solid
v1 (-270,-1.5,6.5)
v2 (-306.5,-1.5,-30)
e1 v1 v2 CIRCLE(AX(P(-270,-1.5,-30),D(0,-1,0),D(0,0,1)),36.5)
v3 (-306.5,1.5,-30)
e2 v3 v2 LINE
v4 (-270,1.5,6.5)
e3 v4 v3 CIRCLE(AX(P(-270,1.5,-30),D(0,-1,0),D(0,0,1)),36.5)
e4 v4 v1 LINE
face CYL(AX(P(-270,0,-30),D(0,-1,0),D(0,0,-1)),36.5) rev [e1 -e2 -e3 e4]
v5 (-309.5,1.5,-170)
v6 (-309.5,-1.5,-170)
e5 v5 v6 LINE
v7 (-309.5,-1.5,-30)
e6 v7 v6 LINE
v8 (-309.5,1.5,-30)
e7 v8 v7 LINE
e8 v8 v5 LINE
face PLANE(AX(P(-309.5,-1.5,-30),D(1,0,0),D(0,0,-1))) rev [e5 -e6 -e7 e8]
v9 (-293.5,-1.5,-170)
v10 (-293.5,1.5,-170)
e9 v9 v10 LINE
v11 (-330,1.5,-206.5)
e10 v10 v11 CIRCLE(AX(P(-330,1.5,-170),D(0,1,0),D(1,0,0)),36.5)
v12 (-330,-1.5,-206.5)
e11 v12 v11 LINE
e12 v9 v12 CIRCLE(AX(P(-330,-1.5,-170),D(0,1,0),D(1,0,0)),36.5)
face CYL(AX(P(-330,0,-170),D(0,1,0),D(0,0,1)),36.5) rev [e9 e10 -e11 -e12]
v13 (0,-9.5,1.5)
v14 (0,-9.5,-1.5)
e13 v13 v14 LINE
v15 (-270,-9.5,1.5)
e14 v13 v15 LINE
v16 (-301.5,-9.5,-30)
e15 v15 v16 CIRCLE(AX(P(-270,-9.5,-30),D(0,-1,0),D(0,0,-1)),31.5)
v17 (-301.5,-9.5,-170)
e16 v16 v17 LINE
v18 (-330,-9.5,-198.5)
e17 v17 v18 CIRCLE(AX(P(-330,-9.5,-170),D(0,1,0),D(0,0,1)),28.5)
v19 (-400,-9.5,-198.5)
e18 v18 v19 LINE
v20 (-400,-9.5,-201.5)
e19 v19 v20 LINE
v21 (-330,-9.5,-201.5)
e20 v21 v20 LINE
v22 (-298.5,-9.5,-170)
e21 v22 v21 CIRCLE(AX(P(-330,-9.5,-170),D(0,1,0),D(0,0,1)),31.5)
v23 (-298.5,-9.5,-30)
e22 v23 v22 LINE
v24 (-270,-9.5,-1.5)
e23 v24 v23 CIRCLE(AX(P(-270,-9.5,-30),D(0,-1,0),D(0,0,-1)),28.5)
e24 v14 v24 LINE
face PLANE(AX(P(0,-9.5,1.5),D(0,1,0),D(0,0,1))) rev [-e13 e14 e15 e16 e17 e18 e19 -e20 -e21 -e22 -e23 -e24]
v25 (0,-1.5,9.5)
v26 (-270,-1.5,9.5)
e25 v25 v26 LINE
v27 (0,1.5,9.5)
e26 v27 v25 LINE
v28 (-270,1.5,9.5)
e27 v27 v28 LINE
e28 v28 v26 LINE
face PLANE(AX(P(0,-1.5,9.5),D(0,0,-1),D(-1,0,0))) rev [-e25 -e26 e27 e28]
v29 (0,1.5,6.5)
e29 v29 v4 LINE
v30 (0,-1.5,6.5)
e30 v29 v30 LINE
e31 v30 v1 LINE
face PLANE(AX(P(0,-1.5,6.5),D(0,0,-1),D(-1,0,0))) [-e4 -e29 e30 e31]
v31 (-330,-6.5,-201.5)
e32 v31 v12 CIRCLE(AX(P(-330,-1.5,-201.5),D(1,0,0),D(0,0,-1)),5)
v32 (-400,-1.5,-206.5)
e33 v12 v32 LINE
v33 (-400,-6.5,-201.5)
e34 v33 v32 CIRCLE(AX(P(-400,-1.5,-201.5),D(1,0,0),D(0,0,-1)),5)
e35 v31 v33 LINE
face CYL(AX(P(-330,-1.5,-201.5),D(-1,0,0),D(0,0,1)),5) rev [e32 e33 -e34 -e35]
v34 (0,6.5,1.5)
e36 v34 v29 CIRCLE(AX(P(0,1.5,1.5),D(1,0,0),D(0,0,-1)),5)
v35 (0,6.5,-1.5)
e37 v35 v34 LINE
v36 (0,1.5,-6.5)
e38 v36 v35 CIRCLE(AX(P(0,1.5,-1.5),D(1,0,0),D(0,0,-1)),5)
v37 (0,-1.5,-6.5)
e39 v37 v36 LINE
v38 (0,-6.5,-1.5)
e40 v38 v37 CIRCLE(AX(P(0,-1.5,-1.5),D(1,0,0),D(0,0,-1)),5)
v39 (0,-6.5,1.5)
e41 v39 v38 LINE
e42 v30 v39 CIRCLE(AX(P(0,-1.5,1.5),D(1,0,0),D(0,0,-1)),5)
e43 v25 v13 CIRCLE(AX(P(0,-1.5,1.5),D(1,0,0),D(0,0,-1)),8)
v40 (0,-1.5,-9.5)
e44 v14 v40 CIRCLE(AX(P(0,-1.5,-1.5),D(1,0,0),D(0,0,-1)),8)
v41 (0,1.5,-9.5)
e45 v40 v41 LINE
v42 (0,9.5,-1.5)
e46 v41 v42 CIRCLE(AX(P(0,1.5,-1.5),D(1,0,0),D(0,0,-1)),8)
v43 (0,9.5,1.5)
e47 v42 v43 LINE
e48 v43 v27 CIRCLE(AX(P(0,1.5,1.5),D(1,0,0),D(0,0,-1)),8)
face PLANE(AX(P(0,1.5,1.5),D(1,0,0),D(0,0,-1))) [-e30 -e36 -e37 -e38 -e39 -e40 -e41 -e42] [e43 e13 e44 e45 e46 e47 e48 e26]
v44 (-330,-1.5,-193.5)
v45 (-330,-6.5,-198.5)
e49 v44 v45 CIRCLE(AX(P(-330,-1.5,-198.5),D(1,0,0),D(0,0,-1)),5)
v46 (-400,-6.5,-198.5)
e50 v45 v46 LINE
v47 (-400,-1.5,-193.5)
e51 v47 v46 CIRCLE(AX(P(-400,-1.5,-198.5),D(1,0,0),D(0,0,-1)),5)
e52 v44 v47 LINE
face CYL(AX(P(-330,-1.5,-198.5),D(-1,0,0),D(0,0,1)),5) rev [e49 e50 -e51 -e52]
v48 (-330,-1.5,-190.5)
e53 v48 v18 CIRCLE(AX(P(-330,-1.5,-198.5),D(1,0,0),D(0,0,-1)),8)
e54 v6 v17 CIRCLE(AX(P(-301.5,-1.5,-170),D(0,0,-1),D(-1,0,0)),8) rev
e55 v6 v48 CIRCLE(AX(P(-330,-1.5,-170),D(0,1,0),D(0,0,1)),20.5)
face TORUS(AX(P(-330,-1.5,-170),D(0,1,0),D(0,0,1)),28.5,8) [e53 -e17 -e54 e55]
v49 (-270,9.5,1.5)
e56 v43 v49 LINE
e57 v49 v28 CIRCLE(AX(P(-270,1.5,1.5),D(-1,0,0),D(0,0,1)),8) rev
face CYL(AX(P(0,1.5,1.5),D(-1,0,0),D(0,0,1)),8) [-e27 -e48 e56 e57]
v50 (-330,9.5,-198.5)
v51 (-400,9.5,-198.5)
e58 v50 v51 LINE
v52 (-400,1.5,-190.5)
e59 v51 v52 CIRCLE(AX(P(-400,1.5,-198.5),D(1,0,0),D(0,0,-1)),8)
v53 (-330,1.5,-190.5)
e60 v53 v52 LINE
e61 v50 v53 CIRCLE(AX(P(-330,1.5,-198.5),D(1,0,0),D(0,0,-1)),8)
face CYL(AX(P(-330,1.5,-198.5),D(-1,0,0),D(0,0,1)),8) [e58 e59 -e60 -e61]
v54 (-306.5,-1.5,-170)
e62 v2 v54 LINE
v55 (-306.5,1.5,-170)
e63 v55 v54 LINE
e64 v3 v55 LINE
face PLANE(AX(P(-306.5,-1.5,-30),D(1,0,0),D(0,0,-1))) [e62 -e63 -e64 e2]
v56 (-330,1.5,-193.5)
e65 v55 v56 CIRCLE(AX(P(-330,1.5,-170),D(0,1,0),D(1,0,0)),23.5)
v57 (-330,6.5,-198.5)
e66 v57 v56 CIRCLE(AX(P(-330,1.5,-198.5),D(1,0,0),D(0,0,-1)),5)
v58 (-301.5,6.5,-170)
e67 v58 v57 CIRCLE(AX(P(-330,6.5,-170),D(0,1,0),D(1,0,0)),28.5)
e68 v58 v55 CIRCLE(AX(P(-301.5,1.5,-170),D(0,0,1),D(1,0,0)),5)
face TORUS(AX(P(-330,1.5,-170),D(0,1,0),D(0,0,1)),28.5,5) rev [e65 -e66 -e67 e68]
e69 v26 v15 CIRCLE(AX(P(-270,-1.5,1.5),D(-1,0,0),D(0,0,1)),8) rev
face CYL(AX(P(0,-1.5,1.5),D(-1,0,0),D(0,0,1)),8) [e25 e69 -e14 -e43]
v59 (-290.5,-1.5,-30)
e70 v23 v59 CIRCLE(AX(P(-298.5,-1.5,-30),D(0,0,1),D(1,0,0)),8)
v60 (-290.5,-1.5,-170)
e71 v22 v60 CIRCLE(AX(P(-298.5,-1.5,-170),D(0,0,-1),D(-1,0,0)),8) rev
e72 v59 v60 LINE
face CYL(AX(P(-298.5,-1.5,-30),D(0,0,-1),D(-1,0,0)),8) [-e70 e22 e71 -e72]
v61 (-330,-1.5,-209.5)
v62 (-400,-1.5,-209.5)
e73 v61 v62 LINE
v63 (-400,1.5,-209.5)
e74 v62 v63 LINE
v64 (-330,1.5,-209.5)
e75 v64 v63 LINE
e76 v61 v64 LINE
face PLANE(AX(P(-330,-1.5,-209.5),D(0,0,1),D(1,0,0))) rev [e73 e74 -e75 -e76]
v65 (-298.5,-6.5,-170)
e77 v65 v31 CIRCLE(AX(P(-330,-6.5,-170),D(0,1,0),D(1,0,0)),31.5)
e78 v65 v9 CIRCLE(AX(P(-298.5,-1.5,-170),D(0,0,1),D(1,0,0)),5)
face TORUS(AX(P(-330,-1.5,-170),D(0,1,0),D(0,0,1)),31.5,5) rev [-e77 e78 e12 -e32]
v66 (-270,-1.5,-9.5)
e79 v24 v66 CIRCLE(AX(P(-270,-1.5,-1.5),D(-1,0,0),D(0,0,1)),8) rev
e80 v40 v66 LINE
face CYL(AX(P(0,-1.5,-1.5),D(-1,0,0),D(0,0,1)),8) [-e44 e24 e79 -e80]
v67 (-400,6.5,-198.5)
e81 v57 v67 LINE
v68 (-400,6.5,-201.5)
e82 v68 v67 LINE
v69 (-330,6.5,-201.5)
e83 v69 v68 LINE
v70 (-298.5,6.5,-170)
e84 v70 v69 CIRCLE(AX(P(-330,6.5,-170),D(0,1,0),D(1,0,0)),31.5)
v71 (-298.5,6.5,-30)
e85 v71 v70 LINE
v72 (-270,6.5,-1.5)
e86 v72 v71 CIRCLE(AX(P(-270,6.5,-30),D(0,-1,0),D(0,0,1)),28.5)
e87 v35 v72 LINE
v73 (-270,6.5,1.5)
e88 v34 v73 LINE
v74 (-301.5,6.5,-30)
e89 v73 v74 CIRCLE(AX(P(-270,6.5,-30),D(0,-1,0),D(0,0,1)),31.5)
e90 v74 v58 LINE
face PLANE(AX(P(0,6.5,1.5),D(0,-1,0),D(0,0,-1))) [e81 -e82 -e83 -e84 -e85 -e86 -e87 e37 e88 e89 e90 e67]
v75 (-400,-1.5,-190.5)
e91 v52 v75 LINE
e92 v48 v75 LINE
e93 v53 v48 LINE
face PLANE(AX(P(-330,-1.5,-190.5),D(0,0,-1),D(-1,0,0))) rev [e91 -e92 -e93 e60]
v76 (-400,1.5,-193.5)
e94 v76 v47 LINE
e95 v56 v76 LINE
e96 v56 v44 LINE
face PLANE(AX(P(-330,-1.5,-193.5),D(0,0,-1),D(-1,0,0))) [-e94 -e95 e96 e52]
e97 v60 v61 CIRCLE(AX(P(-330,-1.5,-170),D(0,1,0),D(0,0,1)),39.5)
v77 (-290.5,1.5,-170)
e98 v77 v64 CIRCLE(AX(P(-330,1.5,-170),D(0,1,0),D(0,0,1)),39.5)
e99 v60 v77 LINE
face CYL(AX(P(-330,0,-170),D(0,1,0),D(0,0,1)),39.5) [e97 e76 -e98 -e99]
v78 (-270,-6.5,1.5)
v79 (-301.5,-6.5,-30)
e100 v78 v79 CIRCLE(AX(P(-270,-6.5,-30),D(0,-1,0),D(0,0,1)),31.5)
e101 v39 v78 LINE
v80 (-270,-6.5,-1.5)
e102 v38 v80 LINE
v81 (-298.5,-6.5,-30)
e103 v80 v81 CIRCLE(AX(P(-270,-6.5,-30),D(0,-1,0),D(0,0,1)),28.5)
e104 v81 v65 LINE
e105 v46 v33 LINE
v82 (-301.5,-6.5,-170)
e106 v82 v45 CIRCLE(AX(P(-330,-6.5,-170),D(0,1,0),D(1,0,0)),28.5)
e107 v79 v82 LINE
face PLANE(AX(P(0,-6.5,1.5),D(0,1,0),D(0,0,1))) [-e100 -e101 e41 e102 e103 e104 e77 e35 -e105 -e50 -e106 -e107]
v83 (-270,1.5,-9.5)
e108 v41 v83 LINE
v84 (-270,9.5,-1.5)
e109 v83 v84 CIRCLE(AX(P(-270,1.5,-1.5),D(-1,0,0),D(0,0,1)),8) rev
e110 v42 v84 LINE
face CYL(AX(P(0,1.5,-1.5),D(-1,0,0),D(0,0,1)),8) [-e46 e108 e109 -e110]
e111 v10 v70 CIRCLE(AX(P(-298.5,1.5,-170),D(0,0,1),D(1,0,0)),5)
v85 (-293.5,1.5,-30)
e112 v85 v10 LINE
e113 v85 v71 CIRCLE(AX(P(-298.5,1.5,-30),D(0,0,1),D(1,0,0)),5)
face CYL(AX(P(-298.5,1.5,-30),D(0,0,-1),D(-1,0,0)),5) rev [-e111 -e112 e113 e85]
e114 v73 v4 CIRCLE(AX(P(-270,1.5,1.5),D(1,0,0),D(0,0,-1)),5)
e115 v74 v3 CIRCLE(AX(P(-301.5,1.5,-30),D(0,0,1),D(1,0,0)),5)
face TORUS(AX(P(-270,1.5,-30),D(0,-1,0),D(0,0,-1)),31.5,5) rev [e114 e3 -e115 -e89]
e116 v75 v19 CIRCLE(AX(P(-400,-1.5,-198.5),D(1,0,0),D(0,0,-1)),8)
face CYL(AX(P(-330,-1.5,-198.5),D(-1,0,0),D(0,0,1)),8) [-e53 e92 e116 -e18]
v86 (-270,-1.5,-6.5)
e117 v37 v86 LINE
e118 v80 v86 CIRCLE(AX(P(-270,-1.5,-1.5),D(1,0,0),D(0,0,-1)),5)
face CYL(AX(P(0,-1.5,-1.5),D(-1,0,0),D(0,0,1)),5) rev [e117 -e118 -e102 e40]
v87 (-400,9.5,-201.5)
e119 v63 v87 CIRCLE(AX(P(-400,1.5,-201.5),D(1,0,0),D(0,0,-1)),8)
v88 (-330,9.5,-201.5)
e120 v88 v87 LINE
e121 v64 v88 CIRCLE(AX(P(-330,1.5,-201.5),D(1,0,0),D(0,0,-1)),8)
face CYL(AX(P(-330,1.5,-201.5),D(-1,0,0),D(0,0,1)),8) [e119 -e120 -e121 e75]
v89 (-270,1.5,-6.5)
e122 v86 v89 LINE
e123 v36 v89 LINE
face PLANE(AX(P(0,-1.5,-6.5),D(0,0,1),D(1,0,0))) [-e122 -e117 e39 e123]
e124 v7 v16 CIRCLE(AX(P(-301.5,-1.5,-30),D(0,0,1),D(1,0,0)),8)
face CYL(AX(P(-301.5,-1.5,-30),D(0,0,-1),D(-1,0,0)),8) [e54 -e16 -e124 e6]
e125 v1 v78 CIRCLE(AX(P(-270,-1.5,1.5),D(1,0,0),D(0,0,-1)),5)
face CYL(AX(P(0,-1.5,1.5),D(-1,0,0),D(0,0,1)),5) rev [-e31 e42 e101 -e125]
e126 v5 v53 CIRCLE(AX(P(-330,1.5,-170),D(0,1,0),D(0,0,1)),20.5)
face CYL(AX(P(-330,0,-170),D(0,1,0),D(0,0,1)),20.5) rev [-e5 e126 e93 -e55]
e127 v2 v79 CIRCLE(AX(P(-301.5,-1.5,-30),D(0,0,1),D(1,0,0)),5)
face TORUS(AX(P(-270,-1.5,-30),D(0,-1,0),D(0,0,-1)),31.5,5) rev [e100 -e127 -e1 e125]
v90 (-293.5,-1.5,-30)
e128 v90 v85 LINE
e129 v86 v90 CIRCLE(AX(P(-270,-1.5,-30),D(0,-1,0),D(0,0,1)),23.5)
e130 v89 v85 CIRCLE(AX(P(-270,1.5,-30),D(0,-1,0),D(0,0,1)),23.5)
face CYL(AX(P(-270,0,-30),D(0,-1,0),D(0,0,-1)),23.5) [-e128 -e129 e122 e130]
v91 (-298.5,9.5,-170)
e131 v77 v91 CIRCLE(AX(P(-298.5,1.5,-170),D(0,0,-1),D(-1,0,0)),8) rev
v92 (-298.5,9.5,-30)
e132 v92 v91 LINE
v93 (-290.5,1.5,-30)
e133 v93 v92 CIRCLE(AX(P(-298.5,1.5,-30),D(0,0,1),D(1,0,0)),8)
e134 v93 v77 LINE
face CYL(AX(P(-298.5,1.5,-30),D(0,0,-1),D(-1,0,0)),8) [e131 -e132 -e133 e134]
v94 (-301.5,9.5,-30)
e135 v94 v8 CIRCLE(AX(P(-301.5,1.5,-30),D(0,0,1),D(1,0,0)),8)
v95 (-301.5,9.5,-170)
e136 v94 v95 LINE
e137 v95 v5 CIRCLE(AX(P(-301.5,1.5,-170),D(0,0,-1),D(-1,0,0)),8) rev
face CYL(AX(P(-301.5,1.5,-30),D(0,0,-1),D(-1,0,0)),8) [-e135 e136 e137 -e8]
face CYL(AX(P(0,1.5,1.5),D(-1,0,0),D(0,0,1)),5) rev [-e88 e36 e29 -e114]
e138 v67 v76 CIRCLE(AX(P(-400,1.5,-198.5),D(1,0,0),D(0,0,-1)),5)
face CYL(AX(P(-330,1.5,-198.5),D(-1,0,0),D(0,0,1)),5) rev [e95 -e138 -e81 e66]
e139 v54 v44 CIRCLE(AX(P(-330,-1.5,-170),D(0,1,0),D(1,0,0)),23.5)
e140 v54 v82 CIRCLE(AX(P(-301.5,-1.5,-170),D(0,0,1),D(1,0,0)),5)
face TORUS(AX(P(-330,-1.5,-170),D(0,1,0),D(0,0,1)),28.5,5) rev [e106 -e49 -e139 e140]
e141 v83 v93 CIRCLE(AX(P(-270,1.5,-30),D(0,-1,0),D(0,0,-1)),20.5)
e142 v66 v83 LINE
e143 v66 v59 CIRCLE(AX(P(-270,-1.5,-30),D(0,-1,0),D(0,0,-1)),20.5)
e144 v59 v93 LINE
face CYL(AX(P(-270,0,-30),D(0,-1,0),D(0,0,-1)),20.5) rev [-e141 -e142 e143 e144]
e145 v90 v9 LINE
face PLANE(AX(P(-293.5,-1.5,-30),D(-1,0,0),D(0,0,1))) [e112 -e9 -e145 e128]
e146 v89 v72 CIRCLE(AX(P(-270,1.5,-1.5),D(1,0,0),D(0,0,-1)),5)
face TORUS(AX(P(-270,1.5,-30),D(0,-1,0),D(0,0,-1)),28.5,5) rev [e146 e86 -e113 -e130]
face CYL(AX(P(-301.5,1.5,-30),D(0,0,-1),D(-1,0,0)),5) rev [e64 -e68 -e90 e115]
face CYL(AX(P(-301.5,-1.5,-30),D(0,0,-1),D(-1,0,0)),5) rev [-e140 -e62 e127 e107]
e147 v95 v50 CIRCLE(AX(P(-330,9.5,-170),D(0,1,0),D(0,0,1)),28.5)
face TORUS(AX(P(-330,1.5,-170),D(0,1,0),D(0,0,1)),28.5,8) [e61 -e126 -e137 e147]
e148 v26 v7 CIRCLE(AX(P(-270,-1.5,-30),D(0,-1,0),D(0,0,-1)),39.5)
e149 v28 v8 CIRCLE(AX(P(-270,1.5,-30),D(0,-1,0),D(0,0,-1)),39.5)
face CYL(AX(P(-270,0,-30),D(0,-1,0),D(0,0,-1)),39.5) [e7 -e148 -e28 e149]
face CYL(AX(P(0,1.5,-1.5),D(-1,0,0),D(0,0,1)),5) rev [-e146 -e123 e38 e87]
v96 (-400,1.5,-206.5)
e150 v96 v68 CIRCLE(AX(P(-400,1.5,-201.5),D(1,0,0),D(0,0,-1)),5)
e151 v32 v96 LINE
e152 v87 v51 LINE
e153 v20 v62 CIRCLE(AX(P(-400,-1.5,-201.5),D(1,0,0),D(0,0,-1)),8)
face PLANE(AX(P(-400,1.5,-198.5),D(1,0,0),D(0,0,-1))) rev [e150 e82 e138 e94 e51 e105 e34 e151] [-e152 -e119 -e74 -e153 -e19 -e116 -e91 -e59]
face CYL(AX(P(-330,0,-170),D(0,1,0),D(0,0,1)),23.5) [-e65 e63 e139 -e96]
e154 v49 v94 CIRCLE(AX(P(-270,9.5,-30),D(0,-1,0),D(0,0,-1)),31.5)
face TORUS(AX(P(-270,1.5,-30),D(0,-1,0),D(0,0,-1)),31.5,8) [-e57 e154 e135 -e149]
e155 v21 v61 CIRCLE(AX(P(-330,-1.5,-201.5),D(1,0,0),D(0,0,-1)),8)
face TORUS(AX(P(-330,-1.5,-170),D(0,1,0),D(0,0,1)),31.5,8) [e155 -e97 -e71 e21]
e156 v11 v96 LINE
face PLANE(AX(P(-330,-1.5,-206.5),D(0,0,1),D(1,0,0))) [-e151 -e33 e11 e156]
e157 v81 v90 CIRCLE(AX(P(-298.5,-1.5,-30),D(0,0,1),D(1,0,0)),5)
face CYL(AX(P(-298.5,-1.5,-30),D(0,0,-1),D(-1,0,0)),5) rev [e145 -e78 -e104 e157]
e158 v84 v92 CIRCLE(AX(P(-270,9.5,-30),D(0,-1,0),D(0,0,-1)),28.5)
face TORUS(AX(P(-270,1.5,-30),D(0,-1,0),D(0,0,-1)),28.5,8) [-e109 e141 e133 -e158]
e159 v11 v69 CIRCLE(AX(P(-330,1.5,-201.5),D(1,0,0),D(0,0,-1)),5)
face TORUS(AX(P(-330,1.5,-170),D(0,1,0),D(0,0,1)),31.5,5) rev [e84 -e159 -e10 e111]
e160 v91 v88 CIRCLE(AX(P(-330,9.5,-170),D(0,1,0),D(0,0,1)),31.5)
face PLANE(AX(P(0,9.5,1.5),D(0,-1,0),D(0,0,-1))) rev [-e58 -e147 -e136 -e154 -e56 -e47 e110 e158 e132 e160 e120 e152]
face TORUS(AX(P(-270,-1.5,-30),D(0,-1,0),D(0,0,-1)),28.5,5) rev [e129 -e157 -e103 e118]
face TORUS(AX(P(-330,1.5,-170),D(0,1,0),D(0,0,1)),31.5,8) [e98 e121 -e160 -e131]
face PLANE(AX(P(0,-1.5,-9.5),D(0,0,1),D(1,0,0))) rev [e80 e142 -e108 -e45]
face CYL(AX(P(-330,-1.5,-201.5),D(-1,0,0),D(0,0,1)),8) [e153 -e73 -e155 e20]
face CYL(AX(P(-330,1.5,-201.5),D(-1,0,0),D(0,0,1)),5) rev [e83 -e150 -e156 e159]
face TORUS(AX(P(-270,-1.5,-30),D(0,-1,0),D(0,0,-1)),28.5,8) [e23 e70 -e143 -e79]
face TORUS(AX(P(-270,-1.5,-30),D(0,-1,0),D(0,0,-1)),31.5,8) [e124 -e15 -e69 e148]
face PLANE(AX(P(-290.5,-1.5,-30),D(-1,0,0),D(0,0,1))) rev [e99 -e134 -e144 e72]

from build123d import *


with BuildPart() as part:
    # Sweep-Thin1: sweep along a path in Sketch1
    with BuildLine(Plane(origin=(0, 0, 0), x_dir=(1, 0, 0), z_dir=(0, 1, 0))) as sweep_thin1_path:
        Line((0, 0), (-270, 0))
        ThreePointArc((-270, 0), (-291.213203436, 8.786796564), (-300, 30))
        Line((-300, 30), (-300, 170))
        ThreePointArc((-300, 170), (-308.786796564, 191.213203436), (-330, 200))
        Line((-330, 200), (-400, 200))
    # Sketch2 → Sweep-Thin1 (sweep)
    with BuildSketch(Plane(origin=(0, 0, 0), x_dir=(0, 0, -1), z_dir=(1, 0, 0))):
        with BuildLine():
            Line((1.5, 9.5), (-1.5, 9.5))
            ThreePointArc((-1.5, 9.5), (-7.156854249, 7.156854249), (-9.5, 1.5))
            Line((-9.5, 1.5), (-9.5, -1.5))
            ThreePointArc((-9.5, -1.5), (-7.156854249, -7.156854249), (-1.5, -9.5))
            Line((-1.5, -9.5), (1.5, -9.5))
            ThreePointArc((1.5, -9.5), (7.156854249, -7.156854249), (9.5, -1.5))
            Line((9.5, -1.5), (9.5, 1.5))
            ThreePointArc((9.5, 1.5), (7.156854249, 7.156854249), (1.5, 9.5))
        make_face()
        with BuildLine():
            Line((1.5, 6.5), (-1.5, 6.5))
            ThreePointArc((-1.5, 6.5), (-5.035533906, 5.035533906), (-6.5, 1.5))
            Line((-6.5, 1.5), (-6.5, -1.5))
            ThreePointArc((-6.5, -1.5), (-5.035533906, -5.035533906), (-1.5, -6.5))
            Line((-1.5, -6.5), (1.5, -6.5))
            ThreePointArc((1.5, -6.5), (5.035533906, -5.035533906), (6.5, -1.5))
            Line((6.5, -1.5), (6.5, 1.5))
            ThreePointArc((6.5, 1.5), (5.035533906, 5.035533906), (1.5, 6.5))
        make_face(mode=Mode.SUBTRACT)
    sweep(path=sweep_thin1_path.line)


solid = part.part
